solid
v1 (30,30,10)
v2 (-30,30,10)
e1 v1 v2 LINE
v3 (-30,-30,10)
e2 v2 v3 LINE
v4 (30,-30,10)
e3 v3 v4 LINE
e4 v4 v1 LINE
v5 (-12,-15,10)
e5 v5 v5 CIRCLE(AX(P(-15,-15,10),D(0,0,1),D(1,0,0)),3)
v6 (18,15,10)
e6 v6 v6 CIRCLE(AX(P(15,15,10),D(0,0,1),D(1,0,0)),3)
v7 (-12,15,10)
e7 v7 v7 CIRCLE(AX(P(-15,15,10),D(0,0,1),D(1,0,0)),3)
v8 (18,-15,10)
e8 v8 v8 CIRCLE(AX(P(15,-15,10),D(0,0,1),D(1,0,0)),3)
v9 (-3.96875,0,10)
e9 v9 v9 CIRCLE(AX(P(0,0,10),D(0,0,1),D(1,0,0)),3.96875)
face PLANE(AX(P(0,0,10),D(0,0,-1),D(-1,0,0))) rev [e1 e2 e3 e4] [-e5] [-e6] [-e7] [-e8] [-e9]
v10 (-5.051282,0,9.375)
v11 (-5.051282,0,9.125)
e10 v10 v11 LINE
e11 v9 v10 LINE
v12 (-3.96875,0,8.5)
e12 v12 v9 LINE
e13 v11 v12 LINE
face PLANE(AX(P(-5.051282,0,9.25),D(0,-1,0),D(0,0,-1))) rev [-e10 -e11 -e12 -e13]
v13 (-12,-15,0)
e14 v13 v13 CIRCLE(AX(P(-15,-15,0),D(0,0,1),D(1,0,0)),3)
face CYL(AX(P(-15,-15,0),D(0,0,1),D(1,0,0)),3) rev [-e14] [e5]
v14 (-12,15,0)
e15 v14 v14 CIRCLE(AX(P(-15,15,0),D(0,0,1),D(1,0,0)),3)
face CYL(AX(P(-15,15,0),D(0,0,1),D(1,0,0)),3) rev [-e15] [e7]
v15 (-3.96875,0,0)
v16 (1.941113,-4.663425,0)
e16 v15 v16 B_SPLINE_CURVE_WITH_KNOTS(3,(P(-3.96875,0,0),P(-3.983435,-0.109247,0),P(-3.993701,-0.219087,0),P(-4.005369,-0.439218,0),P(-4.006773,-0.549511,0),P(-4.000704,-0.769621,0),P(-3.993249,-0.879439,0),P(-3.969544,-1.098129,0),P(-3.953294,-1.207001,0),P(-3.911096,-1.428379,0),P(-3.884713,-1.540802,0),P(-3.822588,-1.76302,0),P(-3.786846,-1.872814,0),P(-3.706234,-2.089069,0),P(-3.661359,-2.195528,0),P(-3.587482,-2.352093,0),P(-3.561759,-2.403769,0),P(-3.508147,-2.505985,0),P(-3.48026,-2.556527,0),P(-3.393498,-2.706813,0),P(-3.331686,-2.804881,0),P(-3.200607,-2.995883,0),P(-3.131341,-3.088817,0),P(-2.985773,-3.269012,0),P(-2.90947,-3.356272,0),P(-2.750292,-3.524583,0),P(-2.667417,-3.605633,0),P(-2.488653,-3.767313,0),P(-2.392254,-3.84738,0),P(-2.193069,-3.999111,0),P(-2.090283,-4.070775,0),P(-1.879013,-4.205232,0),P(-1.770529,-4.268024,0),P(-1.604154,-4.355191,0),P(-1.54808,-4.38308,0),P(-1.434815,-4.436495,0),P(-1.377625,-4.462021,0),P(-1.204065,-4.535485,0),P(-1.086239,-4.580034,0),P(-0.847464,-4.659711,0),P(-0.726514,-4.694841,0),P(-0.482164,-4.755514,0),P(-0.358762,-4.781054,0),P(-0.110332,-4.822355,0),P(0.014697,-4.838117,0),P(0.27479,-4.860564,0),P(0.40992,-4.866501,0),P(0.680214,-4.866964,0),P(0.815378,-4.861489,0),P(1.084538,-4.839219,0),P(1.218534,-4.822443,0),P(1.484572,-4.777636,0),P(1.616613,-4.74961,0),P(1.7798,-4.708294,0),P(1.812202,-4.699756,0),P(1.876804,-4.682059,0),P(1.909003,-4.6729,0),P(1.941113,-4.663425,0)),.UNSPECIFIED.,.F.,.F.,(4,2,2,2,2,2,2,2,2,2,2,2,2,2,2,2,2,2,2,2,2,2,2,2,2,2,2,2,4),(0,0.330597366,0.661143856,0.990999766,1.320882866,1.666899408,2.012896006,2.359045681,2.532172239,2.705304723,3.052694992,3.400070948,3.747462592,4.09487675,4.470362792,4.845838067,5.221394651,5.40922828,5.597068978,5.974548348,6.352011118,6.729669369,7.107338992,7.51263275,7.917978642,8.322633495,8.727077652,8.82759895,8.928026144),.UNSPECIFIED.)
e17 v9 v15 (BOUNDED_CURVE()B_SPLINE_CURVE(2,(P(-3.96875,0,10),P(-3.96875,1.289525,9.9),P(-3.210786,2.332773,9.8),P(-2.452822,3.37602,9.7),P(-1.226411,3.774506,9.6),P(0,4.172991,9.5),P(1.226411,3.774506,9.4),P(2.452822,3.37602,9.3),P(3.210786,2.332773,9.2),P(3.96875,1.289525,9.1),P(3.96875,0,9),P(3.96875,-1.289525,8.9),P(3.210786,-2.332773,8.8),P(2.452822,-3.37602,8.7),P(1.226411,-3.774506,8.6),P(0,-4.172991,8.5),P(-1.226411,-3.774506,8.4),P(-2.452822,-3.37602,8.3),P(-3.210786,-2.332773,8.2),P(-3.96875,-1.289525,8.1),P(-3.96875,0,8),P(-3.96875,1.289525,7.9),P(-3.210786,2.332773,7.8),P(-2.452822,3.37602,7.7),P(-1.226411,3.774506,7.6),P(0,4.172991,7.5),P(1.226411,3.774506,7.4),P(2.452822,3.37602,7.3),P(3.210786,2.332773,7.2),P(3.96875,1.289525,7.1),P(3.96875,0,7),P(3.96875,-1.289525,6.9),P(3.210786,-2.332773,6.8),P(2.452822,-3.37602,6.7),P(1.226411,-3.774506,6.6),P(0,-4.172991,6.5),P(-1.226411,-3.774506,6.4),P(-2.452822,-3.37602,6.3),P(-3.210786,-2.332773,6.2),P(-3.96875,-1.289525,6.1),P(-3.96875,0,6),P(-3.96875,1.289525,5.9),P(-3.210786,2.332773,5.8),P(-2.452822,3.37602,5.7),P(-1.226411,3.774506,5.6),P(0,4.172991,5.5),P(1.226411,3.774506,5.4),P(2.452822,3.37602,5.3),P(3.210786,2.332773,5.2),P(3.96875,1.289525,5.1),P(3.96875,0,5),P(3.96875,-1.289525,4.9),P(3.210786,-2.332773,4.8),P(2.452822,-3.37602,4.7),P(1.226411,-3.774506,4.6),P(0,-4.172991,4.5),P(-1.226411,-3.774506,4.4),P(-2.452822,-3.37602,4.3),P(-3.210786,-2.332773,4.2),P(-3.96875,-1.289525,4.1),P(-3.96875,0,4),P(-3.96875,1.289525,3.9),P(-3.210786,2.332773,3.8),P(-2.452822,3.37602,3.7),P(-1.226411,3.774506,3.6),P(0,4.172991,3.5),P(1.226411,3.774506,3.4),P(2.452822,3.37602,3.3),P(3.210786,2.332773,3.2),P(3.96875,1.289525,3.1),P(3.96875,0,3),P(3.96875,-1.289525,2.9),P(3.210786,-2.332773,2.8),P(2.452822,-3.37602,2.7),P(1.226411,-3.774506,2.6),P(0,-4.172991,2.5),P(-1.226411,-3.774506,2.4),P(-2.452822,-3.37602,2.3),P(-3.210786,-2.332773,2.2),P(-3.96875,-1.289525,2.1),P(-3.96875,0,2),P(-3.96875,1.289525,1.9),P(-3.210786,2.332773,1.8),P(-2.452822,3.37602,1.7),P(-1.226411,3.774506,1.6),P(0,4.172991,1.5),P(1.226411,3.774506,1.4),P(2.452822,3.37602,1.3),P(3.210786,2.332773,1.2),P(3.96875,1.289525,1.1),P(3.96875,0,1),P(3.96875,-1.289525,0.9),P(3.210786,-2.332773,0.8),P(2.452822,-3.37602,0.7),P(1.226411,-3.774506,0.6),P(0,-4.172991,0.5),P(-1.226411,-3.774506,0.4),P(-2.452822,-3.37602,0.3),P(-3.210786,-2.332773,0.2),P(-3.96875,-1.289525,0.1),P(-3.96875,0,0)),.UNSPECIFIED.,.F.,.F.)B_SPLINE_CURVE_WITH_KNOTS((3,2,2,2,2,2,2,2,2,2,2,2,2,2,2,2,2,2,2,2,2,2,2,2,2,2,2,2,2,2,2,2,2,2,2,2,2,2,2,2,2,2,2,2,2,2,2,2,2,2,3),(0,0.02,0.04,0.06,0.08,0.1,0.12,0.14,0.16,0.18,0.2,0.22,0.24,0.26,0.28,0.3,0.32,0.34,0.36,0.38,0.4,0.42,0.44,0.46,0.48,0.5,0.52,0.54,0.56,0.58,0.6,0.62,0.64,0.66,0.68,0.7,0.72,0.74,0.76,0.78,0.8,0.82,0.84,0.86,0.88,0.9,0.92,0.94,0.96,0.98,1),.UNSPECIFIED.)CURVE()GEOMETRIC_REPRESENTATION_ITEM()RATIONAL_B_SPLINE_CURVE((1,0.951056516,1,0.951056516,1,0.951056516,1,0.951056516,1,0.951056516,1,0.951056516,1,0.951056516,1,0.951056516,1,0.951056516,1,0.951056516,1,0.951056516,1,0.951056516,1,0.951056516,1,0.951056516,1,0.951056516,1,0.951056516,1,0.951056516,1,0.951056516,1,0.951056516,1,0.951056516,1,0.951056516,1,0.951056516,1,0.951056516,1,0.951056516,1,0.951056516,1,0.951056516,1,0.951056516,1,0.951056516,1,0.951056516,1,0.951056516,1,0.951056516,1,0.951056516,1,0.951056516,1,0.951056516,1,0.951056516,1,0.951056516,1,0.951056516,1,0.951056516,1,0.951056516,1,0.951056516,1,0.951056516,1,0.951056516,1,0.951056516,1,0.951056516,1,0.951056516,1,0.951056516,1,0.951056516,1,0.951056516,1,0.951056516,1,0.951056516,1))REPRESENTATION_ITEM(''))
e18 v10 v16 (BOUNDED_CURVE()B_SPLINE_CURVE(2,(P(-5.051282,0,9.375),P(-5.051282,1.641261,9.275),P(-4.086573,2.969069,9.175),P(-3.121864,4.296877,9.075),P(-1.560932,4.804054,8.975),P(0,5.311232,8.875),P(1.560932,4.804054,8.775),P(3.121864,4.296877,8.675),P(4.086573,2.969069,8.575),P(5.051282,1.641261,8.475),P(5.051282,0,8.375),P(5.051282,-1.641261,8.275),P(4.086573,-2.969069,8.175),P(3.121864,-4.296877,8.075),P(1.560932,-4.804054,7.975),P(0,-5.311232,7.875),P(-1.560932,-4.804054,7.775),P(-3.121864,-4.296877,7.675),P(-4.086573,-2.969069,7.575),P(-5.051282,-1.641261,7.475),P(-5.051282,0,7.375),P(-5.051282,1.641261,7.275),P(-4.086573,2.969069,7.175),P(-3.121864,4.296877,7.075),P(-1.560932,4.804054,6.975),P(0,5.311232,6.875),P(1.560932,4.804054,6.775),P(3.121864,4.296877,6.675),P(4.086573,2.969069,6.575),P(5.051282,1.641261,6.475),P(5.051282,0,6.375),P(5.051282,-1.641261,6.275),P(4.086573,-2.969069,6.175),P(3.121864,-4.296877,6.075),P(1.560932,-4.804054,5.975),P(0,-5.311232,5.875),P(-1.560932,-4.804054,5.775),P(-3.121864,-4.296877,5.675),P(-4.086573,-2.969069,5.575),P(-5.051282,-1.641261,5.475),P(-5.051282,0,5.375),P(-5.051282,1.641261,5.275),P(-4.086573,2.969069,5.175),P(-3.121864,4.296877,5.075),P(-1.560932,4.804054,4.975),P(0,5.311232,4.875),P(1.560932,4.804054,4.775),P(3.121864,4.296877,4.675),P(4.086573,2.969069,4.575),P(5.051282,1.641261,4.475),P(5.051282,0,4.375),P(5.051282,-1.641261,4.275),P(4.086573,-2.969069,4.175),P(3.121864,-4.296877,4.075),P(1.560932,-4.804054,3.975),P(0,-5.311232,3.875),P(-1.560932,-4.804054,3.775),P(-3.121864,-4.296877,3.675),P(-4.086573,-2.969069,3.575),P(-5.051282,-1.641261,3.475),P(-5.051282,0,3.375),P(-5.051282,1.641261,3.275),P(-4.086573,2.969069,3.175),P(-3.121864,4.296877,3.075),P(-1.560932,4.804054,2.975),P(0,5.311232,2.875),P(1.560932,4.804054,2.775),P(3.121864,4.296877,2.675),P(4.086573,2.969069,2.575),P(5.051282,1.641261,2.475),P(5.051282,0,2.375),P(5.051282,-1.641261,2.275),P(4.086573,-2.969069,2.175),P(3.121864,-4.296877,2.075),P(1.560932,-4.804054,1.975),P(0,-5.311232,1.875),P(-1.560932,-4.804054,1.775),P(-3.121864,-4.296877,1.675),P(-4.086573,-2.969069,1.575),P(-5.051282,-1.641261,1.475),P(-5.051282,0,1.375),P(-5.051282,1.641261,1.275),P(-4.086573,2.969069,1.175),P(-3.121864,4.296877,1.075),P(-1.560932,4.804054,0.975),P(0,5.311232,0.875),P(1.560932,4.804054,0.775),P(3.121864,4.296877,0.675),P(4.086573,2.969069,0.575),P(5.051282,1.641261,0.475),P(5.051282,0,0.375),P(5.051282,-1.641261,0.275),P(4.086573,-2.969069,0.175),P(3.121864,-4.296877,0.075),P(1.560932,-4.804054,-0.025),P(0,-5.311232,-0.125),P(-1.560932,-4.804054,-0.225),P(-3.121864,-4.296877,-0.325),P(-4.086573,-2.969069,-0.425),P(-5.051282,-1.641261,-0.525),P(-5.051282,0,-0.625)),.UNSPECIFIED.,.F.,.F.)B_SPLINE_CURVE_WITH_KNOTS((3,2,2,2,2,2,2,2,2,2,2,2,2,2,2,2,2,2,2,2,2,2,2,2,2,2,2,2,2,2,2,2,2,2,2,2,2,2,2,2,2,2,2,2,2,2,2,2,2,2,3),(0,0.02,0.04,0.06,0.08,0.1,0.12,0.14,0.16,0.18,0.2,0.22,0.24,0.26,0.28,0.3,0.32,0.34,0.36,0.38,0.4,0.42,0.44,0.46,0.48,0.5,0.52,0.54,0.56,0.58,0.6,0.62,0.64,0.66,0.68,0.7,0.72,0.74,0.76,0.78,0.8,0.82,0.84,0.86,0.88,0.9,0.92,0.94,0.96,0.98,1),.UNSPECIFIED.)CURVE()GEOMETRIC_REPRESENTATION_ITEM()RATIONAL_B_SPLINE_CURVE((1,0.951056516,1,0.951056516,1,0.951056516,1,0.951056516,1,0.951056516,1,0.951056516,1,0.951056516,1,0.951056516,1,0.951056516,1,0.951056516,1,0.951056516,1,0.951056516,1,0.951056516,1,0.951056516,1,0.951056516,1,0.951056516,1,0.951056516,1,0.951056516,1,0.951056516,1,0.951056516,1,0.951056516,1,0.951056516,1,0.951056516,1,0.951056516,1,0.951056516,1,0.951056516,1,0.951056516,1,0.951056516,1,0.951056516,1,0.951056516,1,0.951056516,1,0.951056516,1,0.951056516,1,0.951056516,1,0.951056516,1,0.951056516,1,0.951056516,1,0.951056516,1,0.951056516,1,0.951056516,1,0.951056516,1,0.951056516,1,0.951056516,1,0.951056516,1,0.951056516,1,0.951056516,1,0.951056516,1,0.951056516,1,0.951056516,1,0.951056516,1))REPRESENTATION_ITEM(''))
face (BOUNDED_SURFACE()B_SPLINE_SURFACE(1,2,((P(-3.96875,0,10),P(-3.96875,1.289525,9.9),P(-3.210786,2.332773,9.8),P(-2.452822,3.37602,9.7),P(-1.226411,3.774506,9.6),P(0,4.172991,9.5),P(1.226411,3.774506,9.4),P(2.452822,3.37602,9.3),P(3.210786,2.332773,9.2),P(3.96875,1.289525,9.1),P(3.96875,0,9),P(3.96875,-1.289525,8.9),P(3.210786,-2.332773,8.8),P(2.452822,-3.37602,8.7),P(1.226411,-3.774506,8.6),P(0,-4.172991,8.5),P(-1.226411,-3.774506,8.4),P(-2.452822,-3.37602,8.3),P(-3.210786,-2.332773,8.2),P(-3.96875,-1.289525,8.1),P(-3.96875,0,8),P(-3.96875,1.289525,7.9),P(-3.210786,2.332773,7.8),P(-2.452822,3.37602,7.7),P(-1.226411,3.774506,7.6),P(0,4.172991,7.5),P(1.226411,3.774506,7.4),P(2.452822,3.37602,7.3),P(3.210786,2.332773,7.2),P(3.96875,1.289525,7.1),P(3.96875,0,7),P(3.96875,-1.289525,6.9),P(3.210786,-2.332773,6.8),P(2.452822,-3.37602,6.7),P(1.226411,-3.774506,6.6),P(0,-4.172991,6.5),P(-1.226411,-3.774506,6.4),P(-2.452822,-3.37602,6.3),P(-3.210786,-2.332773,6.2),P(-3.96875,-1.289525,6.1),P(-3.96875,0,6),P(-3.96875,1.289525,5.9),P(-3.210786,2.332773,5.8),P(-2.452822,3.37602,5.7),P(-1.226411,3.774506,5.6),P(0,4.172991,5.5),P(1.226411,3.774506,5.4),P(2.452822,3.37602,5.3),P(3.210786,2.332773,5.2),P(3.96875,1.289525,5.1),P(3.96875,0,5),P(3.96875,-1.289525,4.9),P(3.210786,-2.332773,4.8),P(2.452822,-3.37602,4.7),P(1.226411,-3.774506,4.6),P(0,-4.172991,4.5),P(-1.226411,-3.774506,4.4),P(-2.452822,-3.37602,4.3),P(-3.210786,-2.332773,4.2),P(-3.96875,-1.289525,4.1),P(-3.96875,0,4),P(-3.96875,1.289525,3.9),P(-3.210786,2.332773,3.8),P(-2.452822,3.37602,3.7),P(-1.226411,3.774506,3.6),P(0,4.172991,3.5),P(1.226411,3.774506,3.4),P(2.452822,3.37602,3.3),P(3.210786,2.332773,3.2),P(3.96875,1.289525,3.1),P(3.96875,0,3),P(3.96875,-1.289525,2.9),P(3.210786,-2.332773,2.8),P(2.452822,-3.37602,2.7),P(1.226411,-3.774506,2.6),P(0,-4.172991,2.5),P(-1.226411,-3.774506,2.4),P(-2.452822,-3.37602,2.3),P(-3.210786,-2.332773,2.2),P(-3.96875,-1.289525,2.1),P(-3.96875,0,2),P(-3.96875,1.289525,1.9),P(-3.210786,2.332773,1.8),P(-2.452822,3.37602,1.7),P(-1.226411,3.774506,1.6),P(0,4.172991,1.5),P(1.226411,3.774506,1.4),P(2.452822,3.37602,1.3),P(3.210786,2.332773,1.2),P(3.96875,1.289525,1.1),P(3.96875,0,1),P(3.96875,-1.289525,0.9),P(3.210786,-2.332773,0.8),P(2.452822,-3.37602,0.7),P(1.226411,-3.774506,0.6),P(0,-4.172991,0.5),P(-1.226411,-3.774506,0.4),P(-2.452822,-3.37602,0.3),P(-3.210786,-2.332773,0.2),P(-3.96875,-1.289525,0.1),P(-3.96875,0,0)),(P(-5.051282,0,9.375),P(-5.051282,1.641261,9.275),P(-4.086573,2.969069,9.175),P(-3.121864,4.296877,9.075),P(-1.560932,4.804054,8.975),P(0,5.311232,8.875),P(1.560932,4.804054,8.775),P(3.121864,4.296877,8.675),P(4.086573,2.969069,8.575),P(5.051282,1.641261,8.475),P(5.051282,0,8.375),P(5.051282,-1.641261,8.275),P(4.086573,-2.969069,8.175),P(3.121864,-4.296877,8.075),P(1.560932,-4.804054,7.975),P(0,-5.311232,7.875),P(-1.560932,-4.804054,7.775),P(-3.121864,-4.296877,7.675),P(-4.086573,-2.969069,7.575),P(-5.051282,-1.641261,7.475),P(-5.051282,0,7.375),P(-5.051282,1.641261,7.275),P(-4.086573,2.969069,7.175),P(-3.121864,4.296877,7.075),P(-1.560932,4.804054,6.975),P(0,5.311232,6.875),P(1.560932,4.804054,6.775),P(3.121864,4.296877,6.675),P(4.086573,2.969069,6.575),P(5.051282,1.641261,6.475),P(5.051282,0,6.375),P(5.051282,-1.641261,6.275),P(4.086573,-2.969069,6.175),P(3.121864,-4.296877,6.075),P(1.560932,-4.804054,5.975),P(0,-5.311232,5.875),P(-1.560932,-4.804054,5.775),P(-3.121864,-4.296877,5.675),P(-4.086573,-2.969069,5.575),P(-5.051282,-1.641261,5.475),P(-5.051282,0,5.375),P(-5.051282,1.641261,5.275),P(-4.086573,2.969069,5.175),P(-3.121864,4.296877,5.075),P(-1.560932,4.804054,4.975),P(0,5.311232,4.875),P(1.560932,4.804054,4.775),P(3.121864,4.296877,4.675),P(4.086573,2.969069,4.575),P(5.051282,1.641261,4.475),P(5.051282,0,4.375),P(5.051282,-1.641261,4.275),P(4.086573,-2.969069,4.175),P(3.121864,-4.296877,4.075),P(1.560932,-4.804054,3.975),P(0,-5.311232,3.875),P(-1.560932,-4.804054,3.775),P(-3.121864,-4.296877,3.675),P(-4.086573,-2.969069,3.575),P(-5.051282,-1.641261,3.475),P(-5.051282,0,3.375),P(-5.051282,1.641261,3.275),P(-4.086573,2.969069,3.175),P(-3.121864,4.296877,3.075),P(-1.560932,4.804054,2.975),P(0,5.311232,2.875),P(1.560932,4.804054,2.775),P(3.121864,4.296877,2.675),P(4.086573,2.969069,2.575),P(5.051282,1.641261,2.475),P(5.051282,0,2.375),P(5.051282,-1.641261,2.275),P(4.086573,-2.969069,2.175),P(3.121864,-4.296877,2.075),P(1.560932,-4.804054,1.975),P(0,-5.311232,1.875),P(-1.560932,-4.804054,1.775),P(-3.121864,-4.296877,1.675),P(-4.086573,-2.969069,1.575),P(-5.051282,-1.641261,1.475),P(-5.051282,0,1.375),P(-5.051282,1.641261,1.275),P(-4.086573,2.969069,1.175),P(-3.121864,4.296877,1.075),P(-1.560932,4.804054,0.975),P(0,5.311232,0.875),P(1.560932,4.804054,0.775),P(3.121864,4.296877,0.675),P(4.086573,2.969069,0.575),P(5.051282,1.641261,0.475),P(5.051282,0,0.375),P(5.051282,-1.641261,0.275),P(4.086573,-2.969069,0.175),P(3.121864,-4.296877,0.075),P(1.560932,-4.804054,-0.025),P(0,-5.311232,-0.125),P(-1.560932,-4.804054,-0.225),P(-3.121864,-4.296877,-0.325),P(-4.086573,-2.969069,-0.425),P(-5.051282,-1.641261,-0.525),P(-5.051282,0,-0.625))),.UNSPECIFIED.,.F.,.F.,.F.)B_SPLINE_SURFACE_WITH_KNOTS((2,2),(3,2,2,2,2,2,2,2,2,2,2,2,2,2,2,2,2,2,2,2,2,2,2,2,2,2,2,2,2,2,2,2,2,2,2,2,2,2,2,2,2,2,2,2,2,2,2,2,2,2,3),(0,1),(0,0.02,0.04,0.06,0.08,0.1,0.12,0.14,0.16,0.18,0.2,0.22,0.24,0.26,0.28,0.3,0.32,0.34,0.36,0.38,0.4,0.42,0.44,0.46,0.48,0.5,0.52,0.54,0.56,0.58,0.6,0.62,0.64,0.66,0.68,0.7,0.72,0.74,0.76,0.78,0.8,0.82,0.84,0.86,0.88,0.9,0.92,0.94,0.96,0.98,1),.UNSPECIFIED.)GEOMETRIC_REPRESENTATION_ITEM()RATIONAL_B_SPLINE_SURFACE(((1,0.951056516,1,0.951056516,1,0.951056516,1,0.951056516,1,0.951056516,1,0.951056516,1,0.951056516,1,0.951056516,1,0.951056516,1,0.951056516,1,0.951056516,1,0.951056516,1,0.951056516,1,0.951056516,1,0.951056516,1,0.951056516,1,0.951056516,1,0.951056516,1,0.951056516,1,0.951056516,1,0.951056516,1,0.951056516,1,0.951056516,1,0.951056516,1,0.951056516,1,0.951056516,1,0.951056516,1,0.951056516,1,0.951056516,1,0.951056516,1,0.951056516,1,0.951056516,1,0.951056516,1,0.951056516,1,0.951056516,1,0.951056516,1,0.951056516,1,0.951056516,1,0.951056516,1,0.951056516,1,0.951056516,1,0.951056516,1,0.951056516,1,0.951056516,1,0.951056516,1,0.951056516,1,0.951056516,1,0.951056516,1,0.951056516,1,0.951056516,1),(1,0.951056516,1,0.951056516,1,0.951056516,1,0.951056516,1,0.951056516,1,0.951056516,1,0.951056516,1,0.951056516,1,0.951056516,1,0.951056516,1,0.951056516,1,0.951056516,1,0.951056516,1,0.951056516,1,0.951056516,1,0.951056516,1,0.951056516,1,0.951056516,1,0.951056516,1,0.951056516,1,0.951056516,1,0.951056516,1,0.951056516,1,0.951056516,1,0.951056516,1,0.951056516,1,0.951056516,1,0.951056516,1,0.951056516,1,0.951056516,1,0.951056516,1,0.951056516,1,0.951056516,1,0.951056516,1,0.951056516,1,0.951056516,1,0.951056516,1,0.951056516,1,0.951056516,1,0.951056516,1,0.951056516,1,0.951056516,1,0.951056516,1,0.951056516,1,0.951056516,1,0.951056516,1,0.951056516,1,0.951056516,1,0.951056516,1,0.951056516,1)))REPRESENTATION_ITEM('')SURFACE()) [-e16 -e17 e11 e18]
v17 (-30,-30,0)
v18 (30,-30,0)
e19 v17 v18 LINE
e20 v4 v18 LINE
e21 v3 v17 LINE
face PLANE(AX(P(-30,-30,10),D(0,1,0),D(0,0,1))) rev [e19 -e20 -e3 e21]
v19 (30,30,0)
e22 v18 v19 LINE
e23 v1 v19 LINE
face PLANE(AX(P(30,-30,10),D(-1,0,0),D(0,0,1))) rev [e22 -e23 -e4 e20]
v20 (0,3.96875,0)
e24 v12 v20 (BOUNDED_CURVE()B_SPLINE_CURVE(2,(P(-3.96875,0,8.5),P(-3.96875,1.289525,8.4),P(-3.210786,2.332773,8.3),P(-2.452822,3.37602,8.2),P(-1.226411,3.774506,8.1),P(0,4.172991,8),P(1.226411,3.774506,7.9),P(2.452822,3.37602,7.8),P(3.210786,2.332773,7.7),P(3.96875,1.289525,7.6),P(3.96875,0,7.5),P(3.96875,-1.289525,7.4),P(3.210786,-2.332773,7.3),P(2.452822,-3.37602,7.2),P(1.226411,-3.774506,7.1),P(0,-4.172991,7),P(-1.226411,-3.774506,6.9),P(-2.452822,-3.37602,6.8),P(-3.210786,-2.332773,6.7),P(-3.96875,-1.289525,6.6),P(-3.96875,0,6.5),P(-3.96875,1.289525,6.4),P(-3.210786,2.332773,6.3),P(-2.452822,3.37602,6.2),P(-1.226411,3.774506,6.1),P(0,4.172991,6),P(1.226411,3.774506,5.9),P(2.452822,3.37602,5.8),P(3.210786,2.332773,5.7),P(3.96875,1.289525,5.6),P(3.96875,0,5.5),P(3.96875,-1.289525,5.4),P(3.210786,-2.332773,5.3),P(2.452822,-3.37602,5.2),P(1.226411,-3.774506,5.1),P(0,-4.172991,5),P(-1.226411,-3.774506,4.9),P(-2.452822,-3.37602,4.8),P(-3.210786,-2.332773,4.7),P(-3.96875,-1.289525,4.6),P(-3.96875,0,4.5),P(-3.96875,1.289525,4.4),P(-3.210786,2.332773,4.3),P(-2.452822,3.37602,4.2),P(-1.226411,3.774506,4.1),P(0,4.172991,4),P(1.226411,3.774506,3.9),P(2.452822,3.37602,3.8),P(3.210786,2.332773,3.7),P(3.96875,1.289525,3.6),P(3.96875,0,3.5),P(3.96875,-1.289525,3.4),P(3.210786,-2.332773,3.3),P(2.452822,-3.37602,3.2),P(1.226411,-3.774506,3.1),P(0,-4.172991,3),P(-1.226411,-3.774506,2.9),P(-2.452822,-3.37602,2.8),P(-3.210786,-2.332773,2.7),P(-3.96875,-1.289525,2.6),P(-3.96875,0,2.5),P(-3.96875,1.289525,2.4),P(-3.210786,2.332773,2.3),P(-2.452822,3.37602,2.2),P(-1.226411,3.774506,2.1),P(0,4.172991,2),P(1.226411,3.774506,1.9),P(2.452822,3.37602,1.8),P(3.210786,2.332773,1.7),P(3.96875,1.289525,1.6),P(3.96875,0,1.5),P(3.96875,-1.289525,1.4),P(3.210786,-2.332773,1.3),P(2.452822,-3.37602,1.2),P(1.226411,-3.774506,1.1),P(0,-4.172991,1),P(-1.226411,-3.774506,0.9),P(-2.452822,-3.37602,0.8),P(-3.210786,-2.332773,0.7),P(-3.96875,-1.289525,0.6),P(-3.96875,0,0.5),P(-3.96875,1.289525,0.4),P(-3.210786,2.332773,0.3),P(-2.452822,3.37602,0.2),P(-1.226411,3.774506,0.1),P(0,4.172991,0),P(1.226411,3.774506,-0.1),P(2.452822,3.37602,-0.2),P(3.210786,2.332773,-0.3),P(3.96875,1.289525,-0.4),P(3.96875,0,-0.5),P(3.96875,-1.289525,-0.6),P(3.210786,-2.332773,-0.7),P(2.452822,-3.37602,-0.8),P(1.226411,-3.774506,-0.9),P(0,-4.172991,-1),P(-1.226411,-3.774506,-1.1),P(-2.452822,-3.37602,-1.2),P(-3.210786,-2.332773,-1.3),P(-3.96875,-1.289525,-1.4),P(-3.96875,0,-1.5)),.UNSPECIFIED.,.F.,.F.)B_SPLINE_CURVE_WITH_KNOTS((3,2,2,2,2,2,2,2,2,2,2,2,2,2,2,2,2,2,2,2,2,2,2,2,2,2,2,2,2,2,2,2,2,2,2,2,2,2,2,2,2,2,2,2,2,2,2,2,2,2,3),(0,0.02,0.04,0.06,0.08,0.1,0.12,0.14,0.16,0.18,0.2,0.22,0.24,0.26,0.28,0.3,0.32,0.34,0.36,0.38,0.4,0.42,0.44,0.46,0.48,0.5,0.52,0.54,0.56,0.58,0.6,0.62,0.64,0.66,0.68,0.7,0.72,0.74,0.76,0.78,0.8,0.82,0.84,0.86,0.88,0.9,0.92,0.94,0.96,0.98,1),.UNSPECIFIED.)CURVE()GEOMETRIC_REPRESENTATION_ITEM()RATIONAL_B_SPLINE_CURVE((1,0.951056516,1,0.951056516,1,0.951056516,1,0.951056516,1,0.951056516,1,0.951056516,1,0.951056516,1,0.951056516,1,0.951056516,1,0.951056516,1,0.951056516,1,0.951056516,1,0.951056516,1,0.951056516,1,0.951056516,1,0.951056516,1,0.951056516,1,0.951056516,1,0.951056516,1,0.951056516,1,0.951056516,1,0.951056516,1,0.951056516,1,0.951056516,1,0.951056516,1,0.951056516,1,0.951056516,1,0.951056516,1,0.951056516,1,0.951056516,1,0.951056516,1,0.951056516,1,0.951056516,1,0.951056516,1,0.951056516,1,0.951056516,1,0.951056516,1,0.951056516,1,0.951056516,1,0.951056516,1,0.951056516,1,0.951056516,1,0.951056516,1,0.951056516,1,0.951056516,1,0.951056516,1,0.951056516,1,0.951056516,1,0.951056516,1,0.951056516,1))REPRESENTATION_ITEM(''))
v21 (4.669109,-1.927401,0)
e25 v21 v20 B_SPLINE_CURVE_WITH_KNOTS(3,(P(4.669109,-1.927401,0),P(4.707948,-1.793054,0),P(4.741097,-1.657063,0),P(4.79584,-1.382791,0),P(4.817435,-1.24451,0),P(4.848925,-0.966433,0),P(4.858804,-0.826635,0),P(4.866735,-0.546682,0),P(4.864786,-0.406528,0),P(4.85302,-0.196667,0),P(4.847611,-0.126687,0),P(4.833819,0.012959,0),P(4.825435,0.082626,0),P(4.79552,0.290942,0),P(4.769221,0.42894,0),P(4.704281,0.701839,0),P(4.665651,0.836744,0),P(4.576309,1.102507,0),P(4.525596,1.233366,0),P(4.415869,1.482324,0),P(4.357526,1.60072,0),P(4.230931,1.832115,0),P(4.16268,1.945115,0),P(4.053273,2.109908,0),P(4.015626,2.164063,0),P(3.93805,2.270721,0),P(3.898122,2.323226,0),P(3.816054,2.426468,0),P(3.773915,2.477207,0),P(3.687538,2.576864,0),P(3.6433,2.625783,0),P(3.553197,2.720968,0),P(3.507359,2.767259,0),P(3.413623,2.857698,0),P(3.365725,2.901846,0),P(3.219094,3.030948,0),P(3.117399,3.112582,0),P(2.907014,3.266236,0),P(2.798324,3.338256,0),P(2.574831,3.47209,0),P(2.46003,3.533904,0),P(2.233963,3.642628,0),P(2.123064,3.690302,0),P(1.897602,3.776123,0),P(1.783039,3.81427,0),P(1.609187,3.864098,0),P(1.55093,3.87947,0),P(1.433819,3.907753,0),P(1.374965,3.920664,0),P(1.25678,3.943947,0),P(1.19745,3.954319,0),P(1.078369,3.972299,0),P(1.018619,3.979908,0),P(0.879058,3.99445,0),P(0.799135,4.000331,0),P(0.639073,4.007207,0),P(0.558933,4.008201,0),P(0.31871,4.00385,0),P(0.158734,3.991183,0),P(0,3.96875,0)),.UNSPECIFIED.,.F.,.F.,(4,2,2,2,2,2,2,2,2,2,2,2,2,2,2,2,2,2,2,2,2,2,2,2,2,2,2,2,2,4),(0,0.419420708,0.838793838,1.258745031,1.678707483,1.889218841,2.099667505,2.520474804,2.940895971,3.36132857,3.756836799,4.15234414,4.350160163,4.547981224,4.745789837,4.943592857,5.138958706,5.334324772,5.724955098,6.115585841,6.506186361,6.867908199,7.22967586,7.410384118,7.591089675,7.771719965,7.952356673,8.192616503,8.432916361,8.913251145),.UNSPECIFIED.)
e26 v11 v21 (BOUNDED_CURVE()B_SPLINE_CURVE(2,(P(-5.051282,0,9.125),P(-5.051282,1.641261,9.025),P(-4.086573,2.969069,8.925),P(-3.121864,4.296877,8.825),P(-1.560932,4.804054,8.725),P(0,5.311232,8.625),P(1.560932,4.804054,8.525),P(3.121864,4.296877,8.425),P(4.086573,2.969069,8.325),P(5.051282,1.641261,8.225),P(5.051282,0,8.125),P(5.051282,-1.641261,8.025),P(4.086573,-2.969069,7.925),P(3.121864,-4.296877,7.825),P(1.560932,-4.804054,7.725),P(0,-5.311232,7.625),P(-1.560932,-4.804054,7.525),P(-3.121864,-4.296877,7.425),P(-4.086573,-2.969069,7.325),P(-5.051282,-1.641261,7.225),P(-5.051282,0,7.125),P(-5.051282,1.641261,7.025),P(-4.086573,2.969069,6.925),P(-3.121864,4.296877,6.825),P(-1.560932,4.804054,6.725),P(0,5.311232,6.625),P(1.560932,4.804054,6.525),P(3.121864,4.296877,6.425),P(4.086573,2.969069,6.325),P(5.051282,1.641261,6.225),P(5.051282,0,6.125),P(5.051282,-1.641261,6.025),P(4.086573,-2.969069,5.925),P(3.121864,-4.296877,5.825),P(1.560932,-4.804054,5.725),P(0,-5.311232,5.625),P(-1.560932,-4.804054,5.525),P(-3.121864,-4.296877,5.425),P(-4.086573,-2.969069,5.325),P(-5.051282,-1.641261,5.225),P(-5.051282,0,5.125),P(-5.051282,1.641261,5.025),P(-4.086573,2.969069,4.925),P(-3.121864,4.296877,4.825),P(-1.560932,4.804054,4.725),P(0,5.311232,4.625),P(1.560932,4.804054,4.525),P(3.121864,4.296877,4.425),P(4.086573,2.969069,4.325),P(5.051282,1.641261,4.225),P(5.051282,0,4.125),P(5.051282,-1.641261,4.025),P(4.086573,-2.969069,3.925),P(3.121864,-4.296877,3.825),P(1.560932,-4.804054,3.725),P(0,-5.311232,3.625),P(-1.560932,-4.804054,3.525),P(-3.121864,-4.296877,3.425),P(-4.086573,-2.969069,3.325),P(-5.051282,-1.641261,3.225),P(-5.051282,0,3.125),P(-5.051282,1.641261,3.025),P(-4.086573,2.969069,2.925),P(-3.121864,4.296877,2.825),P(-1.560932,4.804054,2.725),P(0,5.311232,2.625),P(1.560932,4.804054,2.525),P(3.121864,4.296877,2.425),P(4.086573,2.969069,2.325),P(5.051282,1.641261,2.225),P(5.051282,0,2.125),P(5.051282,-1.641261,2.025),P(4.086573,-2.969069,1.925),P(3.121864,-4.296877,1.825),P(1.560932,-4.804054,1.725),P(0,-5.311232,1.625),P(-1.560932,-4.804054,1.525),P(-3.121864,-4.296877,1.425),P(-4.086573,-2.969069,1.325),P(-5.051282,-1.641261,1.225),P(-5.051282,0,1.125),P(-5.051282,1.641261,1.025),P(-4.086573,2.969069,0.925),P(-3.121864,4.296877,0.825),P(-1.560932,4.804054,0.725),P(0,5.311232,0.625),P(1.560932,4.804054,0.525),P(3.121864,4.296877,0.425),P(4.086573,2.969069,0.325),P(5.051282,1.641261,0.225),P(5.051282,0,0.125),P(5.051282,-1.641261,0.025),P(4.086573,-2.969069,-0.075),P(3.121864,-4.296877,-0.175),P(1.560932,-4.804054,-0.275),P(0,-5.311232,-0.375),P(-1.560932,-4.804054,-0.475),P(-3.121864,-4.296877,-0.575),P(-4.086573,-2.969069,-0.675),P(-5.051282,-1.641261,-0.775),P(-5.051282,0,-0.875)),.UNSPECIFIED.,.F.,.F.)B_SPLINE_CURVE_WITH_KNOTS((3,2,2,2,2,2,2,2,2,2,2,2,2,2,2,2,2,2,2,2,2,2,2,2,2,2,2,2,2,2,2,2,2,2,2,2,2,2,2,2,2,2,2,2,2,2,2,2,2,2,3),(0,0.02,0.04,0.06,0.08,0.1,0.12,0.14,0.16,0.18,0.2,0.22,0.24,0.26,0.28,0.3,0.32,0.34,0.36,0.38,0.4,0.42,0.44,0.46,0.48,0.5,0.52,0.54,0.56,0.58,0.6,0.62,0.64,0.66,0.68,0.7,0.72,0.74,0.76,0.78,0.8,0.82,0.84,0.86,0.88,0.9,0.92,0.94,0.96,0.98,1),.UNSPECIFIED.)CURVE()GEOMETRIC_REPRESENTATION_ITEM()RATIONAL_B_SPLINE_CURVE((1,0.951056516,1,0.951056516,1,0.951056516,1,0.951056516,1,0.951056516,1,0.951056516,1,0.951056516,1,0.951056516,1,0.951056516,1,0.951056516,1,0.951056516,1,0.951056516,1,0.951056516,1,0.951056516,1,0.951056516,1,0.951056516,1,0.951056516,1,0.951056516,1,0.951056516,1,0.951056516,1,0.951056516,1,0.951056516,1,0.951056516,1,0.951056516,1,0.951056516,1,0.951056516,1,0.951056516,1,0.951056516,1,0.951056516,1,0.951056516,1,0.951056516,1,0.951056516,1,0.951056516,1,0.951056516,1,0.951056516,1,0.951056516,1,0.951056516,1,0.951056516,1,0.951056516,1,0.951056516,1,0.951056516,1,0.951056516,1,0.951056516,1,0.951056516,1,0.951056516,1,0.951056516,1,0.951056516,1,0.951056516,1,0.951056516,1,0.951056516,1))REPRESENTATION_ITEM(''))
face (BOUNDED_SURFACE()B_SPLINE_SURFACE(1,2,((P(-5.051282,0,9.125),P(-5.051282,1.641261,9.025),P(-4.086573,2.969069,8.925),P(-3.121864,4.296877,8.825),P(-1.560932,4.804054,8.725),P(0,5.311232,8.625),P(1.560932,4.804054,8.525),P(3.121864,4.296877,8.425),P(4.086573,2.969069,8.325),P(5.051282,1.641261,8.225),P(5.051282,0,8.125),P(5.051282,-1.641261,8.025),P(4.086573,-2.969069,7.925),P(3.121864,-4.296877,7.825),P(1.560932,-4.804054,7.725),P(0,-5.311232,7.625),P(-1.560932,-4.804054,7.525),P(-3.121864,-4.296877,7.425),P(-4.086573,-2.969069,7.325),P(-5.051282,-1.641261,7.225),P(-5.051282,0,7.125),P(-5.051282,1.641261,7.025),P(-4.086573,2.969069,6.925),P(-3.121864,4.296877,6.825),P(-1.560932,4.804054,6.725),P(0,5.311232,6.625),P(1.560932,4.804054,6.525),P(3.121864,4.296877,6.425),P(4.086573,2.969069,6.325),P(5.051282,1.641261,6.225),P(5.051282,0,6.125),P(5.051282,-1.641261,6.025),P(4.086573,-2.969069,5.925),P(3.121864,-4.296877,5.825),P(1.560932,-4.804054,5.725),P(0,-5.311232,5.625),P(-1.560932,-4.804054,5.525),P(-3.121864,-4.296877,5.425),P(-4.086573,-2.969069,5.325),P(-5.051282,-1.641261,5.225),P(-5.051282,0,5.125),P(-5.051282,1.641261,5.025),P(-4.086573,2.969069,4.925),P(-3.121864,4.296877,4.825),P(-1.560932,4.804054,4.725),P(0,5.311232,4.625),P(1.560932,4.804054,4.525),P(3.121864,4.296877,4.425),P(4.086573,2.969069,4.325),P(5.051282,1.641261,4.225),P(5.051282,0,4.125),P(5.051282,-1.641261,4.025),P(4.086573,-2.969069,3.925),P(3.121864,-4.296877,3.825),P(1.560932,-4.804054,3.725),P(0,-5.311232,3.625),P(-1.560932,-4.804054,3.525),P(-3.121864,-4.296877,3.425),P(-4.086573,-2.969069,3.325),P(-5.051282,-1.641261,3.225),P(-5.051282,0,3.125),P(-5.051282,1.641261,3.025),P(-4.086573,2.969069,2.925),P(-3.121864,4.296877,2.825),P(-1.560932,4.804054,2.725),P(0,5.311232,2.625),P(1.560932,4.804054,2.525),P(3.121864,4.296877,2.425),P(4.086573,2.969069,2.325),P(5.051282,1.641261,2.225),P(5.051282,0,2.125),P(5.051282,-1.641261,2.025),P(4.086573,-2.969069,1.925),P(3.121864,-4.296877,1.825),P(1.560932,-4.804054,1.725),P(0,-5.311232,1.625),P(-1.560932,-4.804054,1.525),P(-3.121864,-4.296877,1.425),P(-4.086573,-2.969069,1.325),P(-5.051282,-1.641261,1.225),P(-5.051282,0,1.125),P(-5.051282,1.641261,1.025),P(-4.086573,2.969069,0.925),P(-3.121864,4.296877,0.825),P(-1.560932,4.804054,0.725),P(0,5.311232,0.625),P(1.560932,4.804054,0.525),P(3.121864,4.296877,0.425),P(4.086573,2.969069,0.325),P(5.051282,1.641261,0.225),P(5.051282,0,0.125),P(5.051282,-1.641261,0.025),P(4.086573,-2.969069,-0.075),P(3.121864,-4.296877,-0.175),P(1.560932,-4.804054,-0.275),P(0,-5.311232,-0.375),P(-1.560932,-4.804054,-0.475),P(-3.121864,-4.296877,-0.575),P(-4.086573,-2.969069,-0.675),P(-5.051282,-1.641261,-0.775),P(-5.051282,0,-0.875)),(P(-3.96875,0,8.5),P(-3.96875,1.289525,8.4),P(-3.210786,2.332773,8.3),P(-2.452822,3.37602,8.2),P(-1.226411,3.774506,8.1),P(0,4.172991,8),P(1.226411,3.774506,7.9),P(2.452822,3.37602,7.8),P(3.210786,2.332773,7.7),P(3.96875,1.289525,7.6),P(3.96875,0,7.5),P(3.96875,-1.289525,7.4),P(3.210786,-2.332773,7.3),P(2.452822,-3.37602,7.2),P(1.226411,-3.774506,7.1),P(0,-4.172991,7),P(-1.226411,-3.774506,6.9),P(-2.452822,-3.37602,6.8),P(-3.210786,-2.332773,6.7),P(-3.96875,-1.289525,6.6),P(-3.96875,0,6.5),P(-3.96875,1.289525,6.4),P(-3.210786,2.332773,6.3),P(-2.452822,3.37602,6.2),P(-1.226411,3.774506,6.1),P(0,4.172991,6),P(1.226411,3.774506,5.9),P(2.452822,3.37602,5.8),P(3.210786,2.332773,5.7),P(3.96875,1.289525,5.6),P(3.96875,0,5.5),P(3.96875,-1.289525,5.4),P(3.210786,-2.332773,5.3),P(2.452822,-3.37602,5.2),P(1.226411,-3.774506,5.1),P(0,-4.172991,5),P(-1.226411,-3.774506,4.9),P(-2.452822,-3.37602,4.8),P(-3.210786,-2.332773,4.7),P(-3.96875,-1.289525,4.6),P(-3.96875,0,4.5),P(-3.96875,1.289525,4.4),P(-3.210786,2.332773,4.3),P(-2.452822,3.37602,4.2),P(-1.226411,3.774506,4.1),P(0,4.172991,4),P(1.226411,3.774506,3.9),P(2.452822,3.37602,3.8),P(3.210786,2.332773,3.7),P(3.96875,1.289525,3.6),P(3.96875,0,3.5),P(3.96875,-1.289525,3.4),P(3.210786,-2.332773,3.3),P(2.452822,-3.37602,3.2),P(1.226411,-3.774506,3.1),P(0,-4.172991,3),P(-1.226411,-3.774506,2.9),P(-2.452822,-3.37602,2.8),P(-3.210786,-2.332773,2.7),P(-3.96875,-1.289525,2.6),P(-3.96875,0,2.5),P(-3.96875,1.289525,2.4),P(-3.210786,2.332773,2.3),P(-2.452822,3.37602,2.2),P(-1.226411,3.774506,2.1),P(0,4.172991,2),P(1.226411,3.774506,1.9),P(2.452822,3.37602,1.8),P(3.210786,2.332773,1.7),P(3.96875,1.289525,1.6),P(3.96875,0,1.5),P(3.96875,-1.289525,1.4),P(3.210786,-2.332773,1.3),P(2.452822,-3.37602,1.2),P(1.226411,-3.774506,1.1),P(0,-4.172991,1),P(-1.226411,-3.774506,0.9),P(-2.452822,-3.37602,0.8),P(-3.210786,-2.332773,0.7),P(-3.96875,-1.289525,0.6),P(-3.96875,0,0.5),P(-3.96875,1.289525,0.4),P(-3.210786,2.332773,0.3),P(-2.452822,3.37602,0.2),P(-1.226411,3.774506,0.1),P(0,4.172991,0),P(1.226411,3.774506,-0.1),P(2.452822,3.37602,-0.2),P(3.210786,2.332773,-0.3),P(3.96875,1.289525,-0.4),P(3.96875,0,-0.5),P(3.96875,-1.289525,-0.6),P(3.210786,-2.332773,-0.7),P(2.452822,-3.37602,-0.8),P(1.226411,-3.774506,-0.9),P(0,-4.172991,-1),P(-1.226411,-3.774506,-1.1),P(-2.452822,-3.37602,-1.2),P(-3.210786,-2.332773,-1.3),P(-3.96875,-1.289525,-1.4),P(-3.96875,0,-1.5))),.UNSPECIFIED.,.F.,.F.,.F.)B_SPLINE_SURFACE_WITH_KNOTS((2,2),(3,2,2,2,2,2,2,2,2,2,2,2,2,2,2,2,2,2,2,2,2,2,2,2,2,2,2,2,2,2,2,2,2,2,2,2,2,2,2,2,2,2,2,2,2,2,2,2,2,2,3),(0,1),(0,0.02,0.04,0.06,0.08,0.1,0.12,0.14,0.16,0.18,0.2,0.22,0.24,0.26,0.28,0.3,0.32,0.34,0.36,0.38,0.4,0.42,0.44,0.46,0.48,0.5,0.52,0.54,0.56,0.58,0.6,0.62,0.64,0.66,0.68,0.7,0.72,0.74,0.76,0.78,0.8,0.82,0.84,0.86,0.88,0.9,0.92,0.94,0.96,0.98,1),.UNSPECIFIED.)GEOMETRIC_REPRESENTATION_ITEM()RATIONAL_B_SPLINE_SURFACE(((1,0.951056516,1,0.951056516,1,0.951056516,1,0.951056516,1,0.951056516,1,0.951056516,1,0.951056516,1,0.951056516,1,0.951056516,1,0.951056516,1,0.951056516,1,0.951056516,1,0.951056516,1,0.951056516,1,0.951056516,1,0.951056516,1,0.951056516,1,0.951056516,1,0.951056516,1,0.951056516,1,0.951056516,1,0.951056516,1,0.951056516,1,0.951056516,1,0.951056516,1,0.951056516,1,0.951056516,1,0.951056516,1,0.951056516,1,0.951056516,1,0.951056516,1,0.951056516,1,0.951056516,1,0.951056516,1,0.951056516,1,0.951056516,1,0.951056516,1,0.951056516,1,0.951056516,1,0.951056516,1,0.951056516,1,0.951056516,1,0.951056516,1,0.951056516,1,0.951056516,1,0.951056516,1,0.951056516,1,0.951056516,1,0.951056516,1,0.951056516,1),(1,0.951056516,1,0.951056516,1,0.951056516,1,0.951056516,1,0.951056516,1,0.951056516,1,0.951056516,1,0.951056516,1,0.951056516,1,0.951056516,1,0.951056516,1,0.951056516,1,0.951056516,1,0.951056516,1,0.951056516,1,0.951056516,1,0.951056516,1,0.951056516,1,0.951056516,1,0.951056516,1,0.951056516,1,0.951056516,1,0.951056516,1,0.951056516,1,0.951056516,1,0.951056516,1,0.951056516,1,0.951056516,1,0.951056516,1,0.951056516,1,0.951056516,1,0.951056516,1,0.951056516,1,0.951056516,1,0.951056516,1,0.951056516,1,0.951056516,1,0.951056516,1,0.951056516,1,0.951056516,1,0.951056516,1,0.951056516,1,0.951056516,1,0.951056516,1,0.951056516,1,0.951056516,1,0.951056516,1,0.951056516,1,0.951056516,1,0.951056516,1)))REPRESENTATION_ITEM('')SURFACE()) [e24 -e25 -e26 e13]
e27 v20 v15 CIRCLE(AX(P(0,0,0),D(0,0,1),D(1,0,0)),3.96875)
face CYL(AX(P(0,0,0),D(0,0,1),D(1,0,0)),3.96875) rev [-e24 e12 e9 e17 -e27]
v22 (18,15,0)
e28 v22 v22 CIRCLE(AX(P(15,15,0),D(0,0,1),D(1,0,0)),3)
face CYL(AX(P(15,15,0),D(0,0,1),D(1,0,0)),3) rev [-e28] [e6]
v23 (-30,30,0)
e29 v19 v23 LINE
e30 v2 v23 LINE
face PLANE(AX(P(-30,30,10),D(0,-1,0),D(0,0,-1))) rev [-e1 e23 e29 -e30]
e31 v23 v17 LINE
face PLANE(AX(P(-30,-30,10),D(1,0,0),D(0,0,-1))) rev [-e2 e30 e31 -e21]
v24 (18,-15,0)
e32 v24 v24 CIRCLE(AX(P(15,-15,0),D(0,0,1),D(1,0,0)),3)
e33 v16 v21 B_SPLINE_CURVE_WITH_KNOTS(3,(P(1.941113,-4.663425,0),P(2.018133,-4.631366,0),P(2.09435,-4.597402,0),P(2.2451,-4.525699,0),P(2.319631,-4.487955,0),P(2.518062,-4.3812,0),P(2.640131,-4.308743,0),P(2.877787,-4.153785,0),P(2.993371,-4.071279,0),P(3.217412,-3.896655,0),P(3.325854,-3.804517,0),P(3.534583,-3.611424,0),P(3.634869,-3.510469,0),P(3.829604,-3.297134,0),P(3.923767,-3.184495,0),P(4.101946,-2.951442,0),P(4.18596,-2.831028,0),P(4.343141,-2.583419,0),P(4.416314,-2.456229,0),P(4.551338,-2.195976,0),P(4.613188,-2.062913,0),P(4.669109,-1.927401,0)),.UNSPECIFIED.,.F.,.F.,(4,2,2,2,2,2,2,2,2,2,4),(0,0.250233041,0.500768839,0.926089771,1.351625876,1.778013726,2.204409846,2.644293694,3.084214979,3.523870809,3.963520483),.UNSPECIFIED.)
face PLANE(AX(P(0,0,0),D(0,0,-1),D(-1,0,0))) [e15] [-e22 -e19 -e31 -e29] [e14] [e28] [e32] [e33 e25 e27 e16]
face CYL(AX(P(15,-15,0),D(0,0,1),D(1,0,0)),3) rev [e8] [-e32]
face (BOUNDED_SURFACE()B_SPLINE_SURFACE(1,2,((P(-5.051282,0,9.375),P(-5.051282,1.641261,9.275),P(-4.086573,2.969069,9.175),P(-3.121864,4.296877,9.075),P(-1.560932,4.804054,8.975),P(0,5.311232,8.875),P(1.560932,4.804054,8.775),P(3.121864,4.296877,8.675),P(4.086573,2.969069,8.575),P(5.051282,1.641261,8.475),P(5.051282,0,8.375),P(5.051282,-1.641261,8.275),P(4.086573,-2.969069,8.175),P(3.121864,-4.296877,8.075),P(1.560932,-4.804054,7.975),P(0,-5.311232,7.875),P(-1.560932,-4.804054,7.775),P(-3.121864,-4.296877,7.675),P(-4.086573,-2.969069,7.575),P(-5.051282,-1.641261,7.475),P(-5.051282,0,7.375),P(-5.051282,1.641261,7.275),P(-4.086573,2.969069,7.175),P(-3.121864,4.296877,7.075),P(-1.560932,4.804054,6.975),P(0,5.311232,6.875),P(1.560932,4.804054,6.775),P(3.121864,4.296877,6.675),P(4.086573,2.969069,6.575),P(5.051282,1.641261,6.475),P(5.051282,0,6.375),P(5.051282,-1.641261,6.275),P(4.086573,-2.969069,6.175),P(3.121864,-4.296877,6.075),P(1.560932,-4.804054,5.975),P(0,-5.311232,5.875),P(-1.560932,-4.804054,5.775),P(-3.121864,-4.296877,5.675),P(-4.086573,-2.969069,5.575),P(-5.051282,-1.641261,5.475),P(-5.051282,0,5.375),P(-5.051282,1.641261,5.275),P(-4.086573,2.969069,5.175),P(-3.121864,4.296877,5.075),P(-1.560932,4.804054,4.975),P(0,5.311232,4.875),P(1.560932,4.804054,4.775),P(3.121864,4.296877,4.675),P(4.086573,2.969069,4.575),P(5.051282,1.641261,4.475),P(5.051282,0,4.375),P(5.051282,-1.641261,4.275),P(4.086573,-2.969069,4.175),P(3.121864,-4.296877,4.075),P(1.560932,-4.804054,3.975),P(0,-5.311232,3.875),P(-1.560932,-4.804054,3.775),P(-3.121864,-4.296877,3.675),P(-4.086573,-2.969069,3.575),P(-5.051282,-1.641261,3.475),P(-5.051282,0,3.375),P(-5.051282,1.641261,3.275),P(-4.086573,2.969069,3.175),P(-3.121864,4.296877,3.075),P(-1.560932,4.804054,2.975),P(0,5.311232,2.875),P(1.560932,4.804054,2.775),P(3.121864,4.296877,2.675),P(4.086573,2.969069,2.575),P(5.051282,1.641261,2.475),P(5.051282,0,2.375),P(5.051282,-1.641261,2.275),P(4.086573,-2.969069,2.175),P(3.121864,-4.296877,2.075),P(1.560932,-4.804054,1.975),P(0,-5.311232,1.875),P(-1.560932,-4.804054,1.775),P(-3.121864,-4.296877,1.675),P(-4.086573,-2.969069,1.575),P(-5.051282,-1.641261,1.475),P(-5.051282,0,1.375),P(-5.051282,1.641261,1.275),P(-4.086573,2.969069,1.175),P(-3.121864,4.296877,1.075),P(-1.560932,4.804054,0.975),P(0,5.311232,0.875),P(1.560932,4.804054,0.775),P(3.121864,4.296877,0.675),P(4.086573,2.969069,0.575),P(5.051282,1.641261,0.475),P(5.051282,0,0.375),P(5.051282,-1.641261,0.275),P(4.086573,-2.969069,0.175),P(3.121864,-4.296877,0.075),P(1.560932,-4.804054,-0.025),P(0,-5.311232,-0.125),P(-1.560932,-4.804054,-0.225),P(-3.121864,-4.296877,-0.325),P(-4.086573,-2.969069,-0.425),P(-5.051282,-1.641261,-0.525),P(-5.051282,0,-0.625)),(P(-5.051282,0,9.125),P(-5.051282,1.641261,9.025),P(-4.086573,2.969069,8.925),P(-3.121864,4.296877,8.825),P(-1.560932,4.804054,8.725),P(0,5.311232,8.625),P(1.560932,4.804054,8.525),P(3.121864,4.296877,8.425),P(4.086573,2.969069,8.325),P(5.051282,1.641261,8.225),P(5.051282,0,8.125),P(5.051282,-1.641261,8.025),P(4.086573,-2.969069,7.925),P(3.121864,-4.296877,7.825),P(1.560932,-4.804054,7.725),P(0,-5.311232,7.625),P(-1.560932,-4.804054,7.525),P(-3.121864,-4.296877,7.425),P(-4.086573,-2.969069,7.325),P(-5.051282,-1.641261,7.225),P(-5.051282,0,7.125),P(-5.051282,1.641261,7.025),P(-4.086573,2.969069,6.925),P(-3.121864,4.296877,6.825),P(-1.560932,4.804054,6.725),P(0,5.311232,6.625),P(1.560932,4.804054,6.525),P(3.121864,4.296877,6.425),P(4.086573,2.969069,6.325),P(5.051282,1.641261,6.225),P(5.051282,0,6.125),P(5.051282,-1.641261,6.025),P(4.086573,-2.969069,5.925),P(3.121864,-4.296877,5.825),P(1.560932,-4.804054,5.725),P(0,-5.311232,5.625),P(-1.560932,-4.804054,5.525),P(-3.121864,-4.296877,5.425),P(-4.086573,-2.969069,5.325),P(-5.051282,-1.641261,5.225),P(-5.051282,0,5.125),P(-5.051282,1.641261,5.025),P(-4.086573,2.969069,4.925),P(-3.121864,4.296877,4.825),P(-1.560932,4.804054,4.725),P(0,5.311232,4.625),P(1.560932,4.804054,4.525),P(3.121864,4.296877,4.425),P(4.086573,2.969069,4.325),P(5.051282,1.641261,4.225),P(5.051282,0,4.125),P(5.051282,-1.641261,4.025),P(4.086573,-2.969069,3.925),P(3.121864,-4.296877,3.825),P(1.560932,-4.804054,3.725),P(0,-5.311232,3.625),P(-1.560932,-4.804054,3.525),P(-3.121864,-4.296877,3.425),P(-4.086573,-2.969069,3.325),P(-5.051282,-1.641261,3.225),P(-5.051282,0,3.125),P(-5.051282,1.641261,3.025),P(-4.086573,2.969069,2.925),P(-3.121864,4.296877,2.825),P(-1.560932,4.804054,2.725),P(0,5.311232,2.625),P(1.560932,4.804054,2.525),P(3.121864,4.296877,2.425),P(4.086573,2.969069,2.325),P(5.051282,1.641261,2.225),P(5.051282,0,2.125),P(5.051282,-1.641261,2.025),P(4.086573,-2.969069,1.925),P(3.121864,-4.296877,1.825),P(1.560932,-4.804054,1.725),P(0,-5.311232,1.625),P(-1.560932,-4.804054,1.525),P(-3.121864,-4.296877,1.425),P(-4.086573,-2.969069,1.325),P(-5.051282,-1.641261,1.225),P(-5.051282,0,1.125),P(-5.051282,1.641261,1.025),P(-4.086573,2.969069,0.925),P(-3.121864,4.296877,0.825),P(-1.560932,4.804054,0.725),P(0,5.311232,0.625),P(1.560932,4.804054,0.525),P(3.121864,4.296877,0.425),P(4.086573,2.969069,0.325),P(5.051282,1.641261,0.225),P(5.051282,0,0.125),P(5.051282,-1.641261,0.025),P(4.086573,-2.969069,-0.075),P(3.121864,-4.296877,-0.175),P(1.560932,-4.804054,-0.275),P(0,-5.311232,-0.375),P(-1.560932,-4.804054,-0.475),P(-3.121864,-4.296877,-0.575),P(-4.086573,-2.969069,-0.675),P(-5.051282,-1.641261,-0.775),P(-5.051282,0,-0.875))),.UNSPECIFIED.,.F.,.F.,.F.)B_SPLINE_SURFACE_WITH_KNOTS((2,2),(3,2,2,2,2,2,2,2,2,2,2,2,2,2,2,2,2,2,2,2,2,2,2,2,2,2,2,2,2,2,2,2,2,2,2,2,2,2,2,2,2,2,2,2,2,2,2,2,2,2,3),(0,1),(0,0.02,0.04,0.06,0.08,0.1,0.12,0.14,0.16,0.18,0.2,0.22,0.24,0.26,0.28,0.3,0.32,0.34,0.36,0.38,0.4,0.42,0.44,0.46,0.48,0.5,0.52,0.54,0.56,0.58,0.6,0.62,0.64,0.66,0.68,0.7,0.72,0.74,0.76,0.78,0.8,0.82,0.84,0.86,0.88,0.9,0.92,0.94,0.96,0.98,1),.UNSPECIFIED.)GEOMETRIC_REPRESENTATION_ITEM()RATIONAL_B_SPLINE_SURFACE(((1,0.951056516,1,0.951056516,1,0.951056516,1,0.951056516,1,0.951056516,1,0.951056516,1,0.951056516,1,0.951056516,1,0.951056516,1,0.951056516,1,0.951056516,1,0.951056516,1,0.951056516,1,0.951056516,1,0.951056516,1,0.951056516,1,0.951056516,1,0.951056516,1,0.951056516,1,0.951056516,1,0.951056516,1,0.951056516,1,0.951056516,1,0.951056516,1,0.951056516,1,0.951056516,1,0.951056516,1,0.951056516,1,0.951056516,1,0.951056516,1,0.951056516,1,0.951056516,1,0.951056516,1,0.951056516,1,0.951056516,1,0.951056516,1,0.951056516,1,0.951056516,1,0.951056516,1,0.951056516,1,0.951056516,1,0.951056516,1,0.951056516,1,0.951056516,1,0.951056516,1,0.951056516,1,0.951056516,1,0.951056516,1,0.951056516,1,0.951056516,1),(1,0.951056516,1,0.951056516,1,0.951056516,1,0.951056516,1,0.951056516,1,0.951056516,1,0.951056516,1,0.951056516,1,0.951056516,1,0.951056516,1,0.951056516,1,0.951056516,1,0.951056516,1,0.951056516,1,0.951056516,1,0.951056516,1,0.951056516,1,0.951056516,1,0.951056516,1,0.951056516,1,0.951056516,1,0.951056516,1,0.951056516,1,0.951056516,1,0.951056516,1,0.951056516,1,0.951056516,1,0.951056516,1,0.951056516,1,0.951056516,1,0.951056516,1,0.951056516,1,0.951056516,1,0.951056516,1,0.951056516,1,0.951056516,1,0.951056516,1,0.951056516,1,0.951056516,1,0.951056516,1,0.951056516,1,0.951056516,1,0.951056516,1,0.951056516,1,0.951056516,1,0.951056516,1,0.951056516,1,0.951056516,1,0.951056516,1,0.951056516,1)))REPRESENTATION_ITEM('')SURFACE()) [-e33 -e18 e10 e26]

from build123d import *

# Parameters (mm, degrees)
SKETCH1_W           = 60
SKETCH1_H           = 60
BOSS_EXTRUDE1_DEPTH = 10
SKETCH2_R           = 3.96875
CUT_EXTRUDE1_DEPTH  = 44.588989435
THREAD1_PITCH       = 2
SKETCH3_R           = 3
CUT_EXTRUDE2_DEPTH  = 10


with BuildPart() as part:
    # Sketch1 → Boss-Extrude1 (new body)
    with BuildSketch(Plane.XY):
        Rectangle(SKETCH1_W, SKETCH1_H)
    extrude(amount=BOSS_EXTRUDE1_DEPTH)

    # Sketch2 → Cut-Extrude1 (cut, through all)
    with BuildSketch(Plane.XY.offset(10)):
        Circle(SKETCH2_R)
    extrude(amount=-CUT_EXTRUDE1_DEPTH, mode=Mode.SUBTRACT)

    # Thread1: the profile of Thread Profile1 profile screwed along a right-hand helix of 5 turns, 10 arcs to a turn; built about Z, then put on its axis
    thread1_z = Axis((0, 0, 0), (0, 0, 1))
    thread1_corners = [(3.96845, 0, -0.000173205), (5.05128175, 0, 0.624999997), (5.05128175, 0, 0.874999997), (3.96845, 0, 1.5001732)]
    with BuildLine(mode=Mode.PRIVATE) as thread1_profile:
        Line(thread1_corners[0], thread1_corners[1])
        Line(thread1_corners[1], thread1_corners[2])
        Line(thread1_corners[2], thread1_corners[3])
        Line(thread1_corners[3], thread1_corners[0])
    thread1_cap = Face(thread1_profile.wire())
    thread1_turn_angles = [0, 18, 36, 54, 72, 90, 108, 126, 144, 162, 180, 198, 216, 234, 252, 270, 288, 306, 324, 342, 360]
    thread1_turn_weights = [1, 0.9510565162951535, 1, 0.9510565162951535, 1, 0.9510565162951535, 1, 0.9510565162951535, 1, 0.9510565162951535, 1, 0.9510565162951535, 1, 0.9510565162951535, 1, 0.9510565162951535, 1, 0.9510565162951535, 1, 0.9510565162951535, 1]
    thread1_turn_rails = [Edge.make_bspline([Vector(p[0], p[1], 0).rotate(thread1_z, thread1_turn_angles[k]) / thread1_turn_weights[k] + Vector(0, 0, p[2] + THREAD1_PITCH * thread1_turn_angles[k] / 360) for k in range(21)], [0, 0, 0, 1, 1, 2, 2, 3, 3, 4, 4, 5, 5, 6, 6, 7, 7, 8, 8, 9, 9, 10, 10, 10], 2, thread1_turn_weights) for p in thread1_corners]
    thread1_turn_sides = [Face.make_surface_from_curves(thread1_turn_rails[p[0]], thread1_turn_rails[p[1]]) for p in [(0, 1), (1, 2), (2, 3), (3, 0)]]
    thread1 = Plane(origin=(0, 0, 10), x_dir=(-1, 0, 0), z_dir=(0, 0, -1)) * Solid(Shell([*[p.moved(Location((0, 0, THREAD1_PITCH * i))) for i in range(5) for p in thread1_turn_sides], thread1_cap, thread1_cap.rotate(thread1_z, 1800).moved(Location((0, 0, THREAD1_PITCH * 1800 / 360)))]))
    add(thread1, mode=Mode.SUBTRACT)

    # Sketch3 → Cut-Extrude2 (cut)
    with BuildSketch(Plane.XY.offset(10)):
        with Locations((15, 15)):
            Circle(SKETCH3_R)
        with Locations((-15, 15)):
            Circle(SKETCH3_R)
        with Locations((-15, -15)):
            Circle(SKETCH3_R)
        with Locations((15, -15)):
            Circle(SKETCH3_R)
    extrude(amount=-CUT_EXTRUDE2_DEPTH, mode=Mode.SUBTRACT)


solid = part.part
